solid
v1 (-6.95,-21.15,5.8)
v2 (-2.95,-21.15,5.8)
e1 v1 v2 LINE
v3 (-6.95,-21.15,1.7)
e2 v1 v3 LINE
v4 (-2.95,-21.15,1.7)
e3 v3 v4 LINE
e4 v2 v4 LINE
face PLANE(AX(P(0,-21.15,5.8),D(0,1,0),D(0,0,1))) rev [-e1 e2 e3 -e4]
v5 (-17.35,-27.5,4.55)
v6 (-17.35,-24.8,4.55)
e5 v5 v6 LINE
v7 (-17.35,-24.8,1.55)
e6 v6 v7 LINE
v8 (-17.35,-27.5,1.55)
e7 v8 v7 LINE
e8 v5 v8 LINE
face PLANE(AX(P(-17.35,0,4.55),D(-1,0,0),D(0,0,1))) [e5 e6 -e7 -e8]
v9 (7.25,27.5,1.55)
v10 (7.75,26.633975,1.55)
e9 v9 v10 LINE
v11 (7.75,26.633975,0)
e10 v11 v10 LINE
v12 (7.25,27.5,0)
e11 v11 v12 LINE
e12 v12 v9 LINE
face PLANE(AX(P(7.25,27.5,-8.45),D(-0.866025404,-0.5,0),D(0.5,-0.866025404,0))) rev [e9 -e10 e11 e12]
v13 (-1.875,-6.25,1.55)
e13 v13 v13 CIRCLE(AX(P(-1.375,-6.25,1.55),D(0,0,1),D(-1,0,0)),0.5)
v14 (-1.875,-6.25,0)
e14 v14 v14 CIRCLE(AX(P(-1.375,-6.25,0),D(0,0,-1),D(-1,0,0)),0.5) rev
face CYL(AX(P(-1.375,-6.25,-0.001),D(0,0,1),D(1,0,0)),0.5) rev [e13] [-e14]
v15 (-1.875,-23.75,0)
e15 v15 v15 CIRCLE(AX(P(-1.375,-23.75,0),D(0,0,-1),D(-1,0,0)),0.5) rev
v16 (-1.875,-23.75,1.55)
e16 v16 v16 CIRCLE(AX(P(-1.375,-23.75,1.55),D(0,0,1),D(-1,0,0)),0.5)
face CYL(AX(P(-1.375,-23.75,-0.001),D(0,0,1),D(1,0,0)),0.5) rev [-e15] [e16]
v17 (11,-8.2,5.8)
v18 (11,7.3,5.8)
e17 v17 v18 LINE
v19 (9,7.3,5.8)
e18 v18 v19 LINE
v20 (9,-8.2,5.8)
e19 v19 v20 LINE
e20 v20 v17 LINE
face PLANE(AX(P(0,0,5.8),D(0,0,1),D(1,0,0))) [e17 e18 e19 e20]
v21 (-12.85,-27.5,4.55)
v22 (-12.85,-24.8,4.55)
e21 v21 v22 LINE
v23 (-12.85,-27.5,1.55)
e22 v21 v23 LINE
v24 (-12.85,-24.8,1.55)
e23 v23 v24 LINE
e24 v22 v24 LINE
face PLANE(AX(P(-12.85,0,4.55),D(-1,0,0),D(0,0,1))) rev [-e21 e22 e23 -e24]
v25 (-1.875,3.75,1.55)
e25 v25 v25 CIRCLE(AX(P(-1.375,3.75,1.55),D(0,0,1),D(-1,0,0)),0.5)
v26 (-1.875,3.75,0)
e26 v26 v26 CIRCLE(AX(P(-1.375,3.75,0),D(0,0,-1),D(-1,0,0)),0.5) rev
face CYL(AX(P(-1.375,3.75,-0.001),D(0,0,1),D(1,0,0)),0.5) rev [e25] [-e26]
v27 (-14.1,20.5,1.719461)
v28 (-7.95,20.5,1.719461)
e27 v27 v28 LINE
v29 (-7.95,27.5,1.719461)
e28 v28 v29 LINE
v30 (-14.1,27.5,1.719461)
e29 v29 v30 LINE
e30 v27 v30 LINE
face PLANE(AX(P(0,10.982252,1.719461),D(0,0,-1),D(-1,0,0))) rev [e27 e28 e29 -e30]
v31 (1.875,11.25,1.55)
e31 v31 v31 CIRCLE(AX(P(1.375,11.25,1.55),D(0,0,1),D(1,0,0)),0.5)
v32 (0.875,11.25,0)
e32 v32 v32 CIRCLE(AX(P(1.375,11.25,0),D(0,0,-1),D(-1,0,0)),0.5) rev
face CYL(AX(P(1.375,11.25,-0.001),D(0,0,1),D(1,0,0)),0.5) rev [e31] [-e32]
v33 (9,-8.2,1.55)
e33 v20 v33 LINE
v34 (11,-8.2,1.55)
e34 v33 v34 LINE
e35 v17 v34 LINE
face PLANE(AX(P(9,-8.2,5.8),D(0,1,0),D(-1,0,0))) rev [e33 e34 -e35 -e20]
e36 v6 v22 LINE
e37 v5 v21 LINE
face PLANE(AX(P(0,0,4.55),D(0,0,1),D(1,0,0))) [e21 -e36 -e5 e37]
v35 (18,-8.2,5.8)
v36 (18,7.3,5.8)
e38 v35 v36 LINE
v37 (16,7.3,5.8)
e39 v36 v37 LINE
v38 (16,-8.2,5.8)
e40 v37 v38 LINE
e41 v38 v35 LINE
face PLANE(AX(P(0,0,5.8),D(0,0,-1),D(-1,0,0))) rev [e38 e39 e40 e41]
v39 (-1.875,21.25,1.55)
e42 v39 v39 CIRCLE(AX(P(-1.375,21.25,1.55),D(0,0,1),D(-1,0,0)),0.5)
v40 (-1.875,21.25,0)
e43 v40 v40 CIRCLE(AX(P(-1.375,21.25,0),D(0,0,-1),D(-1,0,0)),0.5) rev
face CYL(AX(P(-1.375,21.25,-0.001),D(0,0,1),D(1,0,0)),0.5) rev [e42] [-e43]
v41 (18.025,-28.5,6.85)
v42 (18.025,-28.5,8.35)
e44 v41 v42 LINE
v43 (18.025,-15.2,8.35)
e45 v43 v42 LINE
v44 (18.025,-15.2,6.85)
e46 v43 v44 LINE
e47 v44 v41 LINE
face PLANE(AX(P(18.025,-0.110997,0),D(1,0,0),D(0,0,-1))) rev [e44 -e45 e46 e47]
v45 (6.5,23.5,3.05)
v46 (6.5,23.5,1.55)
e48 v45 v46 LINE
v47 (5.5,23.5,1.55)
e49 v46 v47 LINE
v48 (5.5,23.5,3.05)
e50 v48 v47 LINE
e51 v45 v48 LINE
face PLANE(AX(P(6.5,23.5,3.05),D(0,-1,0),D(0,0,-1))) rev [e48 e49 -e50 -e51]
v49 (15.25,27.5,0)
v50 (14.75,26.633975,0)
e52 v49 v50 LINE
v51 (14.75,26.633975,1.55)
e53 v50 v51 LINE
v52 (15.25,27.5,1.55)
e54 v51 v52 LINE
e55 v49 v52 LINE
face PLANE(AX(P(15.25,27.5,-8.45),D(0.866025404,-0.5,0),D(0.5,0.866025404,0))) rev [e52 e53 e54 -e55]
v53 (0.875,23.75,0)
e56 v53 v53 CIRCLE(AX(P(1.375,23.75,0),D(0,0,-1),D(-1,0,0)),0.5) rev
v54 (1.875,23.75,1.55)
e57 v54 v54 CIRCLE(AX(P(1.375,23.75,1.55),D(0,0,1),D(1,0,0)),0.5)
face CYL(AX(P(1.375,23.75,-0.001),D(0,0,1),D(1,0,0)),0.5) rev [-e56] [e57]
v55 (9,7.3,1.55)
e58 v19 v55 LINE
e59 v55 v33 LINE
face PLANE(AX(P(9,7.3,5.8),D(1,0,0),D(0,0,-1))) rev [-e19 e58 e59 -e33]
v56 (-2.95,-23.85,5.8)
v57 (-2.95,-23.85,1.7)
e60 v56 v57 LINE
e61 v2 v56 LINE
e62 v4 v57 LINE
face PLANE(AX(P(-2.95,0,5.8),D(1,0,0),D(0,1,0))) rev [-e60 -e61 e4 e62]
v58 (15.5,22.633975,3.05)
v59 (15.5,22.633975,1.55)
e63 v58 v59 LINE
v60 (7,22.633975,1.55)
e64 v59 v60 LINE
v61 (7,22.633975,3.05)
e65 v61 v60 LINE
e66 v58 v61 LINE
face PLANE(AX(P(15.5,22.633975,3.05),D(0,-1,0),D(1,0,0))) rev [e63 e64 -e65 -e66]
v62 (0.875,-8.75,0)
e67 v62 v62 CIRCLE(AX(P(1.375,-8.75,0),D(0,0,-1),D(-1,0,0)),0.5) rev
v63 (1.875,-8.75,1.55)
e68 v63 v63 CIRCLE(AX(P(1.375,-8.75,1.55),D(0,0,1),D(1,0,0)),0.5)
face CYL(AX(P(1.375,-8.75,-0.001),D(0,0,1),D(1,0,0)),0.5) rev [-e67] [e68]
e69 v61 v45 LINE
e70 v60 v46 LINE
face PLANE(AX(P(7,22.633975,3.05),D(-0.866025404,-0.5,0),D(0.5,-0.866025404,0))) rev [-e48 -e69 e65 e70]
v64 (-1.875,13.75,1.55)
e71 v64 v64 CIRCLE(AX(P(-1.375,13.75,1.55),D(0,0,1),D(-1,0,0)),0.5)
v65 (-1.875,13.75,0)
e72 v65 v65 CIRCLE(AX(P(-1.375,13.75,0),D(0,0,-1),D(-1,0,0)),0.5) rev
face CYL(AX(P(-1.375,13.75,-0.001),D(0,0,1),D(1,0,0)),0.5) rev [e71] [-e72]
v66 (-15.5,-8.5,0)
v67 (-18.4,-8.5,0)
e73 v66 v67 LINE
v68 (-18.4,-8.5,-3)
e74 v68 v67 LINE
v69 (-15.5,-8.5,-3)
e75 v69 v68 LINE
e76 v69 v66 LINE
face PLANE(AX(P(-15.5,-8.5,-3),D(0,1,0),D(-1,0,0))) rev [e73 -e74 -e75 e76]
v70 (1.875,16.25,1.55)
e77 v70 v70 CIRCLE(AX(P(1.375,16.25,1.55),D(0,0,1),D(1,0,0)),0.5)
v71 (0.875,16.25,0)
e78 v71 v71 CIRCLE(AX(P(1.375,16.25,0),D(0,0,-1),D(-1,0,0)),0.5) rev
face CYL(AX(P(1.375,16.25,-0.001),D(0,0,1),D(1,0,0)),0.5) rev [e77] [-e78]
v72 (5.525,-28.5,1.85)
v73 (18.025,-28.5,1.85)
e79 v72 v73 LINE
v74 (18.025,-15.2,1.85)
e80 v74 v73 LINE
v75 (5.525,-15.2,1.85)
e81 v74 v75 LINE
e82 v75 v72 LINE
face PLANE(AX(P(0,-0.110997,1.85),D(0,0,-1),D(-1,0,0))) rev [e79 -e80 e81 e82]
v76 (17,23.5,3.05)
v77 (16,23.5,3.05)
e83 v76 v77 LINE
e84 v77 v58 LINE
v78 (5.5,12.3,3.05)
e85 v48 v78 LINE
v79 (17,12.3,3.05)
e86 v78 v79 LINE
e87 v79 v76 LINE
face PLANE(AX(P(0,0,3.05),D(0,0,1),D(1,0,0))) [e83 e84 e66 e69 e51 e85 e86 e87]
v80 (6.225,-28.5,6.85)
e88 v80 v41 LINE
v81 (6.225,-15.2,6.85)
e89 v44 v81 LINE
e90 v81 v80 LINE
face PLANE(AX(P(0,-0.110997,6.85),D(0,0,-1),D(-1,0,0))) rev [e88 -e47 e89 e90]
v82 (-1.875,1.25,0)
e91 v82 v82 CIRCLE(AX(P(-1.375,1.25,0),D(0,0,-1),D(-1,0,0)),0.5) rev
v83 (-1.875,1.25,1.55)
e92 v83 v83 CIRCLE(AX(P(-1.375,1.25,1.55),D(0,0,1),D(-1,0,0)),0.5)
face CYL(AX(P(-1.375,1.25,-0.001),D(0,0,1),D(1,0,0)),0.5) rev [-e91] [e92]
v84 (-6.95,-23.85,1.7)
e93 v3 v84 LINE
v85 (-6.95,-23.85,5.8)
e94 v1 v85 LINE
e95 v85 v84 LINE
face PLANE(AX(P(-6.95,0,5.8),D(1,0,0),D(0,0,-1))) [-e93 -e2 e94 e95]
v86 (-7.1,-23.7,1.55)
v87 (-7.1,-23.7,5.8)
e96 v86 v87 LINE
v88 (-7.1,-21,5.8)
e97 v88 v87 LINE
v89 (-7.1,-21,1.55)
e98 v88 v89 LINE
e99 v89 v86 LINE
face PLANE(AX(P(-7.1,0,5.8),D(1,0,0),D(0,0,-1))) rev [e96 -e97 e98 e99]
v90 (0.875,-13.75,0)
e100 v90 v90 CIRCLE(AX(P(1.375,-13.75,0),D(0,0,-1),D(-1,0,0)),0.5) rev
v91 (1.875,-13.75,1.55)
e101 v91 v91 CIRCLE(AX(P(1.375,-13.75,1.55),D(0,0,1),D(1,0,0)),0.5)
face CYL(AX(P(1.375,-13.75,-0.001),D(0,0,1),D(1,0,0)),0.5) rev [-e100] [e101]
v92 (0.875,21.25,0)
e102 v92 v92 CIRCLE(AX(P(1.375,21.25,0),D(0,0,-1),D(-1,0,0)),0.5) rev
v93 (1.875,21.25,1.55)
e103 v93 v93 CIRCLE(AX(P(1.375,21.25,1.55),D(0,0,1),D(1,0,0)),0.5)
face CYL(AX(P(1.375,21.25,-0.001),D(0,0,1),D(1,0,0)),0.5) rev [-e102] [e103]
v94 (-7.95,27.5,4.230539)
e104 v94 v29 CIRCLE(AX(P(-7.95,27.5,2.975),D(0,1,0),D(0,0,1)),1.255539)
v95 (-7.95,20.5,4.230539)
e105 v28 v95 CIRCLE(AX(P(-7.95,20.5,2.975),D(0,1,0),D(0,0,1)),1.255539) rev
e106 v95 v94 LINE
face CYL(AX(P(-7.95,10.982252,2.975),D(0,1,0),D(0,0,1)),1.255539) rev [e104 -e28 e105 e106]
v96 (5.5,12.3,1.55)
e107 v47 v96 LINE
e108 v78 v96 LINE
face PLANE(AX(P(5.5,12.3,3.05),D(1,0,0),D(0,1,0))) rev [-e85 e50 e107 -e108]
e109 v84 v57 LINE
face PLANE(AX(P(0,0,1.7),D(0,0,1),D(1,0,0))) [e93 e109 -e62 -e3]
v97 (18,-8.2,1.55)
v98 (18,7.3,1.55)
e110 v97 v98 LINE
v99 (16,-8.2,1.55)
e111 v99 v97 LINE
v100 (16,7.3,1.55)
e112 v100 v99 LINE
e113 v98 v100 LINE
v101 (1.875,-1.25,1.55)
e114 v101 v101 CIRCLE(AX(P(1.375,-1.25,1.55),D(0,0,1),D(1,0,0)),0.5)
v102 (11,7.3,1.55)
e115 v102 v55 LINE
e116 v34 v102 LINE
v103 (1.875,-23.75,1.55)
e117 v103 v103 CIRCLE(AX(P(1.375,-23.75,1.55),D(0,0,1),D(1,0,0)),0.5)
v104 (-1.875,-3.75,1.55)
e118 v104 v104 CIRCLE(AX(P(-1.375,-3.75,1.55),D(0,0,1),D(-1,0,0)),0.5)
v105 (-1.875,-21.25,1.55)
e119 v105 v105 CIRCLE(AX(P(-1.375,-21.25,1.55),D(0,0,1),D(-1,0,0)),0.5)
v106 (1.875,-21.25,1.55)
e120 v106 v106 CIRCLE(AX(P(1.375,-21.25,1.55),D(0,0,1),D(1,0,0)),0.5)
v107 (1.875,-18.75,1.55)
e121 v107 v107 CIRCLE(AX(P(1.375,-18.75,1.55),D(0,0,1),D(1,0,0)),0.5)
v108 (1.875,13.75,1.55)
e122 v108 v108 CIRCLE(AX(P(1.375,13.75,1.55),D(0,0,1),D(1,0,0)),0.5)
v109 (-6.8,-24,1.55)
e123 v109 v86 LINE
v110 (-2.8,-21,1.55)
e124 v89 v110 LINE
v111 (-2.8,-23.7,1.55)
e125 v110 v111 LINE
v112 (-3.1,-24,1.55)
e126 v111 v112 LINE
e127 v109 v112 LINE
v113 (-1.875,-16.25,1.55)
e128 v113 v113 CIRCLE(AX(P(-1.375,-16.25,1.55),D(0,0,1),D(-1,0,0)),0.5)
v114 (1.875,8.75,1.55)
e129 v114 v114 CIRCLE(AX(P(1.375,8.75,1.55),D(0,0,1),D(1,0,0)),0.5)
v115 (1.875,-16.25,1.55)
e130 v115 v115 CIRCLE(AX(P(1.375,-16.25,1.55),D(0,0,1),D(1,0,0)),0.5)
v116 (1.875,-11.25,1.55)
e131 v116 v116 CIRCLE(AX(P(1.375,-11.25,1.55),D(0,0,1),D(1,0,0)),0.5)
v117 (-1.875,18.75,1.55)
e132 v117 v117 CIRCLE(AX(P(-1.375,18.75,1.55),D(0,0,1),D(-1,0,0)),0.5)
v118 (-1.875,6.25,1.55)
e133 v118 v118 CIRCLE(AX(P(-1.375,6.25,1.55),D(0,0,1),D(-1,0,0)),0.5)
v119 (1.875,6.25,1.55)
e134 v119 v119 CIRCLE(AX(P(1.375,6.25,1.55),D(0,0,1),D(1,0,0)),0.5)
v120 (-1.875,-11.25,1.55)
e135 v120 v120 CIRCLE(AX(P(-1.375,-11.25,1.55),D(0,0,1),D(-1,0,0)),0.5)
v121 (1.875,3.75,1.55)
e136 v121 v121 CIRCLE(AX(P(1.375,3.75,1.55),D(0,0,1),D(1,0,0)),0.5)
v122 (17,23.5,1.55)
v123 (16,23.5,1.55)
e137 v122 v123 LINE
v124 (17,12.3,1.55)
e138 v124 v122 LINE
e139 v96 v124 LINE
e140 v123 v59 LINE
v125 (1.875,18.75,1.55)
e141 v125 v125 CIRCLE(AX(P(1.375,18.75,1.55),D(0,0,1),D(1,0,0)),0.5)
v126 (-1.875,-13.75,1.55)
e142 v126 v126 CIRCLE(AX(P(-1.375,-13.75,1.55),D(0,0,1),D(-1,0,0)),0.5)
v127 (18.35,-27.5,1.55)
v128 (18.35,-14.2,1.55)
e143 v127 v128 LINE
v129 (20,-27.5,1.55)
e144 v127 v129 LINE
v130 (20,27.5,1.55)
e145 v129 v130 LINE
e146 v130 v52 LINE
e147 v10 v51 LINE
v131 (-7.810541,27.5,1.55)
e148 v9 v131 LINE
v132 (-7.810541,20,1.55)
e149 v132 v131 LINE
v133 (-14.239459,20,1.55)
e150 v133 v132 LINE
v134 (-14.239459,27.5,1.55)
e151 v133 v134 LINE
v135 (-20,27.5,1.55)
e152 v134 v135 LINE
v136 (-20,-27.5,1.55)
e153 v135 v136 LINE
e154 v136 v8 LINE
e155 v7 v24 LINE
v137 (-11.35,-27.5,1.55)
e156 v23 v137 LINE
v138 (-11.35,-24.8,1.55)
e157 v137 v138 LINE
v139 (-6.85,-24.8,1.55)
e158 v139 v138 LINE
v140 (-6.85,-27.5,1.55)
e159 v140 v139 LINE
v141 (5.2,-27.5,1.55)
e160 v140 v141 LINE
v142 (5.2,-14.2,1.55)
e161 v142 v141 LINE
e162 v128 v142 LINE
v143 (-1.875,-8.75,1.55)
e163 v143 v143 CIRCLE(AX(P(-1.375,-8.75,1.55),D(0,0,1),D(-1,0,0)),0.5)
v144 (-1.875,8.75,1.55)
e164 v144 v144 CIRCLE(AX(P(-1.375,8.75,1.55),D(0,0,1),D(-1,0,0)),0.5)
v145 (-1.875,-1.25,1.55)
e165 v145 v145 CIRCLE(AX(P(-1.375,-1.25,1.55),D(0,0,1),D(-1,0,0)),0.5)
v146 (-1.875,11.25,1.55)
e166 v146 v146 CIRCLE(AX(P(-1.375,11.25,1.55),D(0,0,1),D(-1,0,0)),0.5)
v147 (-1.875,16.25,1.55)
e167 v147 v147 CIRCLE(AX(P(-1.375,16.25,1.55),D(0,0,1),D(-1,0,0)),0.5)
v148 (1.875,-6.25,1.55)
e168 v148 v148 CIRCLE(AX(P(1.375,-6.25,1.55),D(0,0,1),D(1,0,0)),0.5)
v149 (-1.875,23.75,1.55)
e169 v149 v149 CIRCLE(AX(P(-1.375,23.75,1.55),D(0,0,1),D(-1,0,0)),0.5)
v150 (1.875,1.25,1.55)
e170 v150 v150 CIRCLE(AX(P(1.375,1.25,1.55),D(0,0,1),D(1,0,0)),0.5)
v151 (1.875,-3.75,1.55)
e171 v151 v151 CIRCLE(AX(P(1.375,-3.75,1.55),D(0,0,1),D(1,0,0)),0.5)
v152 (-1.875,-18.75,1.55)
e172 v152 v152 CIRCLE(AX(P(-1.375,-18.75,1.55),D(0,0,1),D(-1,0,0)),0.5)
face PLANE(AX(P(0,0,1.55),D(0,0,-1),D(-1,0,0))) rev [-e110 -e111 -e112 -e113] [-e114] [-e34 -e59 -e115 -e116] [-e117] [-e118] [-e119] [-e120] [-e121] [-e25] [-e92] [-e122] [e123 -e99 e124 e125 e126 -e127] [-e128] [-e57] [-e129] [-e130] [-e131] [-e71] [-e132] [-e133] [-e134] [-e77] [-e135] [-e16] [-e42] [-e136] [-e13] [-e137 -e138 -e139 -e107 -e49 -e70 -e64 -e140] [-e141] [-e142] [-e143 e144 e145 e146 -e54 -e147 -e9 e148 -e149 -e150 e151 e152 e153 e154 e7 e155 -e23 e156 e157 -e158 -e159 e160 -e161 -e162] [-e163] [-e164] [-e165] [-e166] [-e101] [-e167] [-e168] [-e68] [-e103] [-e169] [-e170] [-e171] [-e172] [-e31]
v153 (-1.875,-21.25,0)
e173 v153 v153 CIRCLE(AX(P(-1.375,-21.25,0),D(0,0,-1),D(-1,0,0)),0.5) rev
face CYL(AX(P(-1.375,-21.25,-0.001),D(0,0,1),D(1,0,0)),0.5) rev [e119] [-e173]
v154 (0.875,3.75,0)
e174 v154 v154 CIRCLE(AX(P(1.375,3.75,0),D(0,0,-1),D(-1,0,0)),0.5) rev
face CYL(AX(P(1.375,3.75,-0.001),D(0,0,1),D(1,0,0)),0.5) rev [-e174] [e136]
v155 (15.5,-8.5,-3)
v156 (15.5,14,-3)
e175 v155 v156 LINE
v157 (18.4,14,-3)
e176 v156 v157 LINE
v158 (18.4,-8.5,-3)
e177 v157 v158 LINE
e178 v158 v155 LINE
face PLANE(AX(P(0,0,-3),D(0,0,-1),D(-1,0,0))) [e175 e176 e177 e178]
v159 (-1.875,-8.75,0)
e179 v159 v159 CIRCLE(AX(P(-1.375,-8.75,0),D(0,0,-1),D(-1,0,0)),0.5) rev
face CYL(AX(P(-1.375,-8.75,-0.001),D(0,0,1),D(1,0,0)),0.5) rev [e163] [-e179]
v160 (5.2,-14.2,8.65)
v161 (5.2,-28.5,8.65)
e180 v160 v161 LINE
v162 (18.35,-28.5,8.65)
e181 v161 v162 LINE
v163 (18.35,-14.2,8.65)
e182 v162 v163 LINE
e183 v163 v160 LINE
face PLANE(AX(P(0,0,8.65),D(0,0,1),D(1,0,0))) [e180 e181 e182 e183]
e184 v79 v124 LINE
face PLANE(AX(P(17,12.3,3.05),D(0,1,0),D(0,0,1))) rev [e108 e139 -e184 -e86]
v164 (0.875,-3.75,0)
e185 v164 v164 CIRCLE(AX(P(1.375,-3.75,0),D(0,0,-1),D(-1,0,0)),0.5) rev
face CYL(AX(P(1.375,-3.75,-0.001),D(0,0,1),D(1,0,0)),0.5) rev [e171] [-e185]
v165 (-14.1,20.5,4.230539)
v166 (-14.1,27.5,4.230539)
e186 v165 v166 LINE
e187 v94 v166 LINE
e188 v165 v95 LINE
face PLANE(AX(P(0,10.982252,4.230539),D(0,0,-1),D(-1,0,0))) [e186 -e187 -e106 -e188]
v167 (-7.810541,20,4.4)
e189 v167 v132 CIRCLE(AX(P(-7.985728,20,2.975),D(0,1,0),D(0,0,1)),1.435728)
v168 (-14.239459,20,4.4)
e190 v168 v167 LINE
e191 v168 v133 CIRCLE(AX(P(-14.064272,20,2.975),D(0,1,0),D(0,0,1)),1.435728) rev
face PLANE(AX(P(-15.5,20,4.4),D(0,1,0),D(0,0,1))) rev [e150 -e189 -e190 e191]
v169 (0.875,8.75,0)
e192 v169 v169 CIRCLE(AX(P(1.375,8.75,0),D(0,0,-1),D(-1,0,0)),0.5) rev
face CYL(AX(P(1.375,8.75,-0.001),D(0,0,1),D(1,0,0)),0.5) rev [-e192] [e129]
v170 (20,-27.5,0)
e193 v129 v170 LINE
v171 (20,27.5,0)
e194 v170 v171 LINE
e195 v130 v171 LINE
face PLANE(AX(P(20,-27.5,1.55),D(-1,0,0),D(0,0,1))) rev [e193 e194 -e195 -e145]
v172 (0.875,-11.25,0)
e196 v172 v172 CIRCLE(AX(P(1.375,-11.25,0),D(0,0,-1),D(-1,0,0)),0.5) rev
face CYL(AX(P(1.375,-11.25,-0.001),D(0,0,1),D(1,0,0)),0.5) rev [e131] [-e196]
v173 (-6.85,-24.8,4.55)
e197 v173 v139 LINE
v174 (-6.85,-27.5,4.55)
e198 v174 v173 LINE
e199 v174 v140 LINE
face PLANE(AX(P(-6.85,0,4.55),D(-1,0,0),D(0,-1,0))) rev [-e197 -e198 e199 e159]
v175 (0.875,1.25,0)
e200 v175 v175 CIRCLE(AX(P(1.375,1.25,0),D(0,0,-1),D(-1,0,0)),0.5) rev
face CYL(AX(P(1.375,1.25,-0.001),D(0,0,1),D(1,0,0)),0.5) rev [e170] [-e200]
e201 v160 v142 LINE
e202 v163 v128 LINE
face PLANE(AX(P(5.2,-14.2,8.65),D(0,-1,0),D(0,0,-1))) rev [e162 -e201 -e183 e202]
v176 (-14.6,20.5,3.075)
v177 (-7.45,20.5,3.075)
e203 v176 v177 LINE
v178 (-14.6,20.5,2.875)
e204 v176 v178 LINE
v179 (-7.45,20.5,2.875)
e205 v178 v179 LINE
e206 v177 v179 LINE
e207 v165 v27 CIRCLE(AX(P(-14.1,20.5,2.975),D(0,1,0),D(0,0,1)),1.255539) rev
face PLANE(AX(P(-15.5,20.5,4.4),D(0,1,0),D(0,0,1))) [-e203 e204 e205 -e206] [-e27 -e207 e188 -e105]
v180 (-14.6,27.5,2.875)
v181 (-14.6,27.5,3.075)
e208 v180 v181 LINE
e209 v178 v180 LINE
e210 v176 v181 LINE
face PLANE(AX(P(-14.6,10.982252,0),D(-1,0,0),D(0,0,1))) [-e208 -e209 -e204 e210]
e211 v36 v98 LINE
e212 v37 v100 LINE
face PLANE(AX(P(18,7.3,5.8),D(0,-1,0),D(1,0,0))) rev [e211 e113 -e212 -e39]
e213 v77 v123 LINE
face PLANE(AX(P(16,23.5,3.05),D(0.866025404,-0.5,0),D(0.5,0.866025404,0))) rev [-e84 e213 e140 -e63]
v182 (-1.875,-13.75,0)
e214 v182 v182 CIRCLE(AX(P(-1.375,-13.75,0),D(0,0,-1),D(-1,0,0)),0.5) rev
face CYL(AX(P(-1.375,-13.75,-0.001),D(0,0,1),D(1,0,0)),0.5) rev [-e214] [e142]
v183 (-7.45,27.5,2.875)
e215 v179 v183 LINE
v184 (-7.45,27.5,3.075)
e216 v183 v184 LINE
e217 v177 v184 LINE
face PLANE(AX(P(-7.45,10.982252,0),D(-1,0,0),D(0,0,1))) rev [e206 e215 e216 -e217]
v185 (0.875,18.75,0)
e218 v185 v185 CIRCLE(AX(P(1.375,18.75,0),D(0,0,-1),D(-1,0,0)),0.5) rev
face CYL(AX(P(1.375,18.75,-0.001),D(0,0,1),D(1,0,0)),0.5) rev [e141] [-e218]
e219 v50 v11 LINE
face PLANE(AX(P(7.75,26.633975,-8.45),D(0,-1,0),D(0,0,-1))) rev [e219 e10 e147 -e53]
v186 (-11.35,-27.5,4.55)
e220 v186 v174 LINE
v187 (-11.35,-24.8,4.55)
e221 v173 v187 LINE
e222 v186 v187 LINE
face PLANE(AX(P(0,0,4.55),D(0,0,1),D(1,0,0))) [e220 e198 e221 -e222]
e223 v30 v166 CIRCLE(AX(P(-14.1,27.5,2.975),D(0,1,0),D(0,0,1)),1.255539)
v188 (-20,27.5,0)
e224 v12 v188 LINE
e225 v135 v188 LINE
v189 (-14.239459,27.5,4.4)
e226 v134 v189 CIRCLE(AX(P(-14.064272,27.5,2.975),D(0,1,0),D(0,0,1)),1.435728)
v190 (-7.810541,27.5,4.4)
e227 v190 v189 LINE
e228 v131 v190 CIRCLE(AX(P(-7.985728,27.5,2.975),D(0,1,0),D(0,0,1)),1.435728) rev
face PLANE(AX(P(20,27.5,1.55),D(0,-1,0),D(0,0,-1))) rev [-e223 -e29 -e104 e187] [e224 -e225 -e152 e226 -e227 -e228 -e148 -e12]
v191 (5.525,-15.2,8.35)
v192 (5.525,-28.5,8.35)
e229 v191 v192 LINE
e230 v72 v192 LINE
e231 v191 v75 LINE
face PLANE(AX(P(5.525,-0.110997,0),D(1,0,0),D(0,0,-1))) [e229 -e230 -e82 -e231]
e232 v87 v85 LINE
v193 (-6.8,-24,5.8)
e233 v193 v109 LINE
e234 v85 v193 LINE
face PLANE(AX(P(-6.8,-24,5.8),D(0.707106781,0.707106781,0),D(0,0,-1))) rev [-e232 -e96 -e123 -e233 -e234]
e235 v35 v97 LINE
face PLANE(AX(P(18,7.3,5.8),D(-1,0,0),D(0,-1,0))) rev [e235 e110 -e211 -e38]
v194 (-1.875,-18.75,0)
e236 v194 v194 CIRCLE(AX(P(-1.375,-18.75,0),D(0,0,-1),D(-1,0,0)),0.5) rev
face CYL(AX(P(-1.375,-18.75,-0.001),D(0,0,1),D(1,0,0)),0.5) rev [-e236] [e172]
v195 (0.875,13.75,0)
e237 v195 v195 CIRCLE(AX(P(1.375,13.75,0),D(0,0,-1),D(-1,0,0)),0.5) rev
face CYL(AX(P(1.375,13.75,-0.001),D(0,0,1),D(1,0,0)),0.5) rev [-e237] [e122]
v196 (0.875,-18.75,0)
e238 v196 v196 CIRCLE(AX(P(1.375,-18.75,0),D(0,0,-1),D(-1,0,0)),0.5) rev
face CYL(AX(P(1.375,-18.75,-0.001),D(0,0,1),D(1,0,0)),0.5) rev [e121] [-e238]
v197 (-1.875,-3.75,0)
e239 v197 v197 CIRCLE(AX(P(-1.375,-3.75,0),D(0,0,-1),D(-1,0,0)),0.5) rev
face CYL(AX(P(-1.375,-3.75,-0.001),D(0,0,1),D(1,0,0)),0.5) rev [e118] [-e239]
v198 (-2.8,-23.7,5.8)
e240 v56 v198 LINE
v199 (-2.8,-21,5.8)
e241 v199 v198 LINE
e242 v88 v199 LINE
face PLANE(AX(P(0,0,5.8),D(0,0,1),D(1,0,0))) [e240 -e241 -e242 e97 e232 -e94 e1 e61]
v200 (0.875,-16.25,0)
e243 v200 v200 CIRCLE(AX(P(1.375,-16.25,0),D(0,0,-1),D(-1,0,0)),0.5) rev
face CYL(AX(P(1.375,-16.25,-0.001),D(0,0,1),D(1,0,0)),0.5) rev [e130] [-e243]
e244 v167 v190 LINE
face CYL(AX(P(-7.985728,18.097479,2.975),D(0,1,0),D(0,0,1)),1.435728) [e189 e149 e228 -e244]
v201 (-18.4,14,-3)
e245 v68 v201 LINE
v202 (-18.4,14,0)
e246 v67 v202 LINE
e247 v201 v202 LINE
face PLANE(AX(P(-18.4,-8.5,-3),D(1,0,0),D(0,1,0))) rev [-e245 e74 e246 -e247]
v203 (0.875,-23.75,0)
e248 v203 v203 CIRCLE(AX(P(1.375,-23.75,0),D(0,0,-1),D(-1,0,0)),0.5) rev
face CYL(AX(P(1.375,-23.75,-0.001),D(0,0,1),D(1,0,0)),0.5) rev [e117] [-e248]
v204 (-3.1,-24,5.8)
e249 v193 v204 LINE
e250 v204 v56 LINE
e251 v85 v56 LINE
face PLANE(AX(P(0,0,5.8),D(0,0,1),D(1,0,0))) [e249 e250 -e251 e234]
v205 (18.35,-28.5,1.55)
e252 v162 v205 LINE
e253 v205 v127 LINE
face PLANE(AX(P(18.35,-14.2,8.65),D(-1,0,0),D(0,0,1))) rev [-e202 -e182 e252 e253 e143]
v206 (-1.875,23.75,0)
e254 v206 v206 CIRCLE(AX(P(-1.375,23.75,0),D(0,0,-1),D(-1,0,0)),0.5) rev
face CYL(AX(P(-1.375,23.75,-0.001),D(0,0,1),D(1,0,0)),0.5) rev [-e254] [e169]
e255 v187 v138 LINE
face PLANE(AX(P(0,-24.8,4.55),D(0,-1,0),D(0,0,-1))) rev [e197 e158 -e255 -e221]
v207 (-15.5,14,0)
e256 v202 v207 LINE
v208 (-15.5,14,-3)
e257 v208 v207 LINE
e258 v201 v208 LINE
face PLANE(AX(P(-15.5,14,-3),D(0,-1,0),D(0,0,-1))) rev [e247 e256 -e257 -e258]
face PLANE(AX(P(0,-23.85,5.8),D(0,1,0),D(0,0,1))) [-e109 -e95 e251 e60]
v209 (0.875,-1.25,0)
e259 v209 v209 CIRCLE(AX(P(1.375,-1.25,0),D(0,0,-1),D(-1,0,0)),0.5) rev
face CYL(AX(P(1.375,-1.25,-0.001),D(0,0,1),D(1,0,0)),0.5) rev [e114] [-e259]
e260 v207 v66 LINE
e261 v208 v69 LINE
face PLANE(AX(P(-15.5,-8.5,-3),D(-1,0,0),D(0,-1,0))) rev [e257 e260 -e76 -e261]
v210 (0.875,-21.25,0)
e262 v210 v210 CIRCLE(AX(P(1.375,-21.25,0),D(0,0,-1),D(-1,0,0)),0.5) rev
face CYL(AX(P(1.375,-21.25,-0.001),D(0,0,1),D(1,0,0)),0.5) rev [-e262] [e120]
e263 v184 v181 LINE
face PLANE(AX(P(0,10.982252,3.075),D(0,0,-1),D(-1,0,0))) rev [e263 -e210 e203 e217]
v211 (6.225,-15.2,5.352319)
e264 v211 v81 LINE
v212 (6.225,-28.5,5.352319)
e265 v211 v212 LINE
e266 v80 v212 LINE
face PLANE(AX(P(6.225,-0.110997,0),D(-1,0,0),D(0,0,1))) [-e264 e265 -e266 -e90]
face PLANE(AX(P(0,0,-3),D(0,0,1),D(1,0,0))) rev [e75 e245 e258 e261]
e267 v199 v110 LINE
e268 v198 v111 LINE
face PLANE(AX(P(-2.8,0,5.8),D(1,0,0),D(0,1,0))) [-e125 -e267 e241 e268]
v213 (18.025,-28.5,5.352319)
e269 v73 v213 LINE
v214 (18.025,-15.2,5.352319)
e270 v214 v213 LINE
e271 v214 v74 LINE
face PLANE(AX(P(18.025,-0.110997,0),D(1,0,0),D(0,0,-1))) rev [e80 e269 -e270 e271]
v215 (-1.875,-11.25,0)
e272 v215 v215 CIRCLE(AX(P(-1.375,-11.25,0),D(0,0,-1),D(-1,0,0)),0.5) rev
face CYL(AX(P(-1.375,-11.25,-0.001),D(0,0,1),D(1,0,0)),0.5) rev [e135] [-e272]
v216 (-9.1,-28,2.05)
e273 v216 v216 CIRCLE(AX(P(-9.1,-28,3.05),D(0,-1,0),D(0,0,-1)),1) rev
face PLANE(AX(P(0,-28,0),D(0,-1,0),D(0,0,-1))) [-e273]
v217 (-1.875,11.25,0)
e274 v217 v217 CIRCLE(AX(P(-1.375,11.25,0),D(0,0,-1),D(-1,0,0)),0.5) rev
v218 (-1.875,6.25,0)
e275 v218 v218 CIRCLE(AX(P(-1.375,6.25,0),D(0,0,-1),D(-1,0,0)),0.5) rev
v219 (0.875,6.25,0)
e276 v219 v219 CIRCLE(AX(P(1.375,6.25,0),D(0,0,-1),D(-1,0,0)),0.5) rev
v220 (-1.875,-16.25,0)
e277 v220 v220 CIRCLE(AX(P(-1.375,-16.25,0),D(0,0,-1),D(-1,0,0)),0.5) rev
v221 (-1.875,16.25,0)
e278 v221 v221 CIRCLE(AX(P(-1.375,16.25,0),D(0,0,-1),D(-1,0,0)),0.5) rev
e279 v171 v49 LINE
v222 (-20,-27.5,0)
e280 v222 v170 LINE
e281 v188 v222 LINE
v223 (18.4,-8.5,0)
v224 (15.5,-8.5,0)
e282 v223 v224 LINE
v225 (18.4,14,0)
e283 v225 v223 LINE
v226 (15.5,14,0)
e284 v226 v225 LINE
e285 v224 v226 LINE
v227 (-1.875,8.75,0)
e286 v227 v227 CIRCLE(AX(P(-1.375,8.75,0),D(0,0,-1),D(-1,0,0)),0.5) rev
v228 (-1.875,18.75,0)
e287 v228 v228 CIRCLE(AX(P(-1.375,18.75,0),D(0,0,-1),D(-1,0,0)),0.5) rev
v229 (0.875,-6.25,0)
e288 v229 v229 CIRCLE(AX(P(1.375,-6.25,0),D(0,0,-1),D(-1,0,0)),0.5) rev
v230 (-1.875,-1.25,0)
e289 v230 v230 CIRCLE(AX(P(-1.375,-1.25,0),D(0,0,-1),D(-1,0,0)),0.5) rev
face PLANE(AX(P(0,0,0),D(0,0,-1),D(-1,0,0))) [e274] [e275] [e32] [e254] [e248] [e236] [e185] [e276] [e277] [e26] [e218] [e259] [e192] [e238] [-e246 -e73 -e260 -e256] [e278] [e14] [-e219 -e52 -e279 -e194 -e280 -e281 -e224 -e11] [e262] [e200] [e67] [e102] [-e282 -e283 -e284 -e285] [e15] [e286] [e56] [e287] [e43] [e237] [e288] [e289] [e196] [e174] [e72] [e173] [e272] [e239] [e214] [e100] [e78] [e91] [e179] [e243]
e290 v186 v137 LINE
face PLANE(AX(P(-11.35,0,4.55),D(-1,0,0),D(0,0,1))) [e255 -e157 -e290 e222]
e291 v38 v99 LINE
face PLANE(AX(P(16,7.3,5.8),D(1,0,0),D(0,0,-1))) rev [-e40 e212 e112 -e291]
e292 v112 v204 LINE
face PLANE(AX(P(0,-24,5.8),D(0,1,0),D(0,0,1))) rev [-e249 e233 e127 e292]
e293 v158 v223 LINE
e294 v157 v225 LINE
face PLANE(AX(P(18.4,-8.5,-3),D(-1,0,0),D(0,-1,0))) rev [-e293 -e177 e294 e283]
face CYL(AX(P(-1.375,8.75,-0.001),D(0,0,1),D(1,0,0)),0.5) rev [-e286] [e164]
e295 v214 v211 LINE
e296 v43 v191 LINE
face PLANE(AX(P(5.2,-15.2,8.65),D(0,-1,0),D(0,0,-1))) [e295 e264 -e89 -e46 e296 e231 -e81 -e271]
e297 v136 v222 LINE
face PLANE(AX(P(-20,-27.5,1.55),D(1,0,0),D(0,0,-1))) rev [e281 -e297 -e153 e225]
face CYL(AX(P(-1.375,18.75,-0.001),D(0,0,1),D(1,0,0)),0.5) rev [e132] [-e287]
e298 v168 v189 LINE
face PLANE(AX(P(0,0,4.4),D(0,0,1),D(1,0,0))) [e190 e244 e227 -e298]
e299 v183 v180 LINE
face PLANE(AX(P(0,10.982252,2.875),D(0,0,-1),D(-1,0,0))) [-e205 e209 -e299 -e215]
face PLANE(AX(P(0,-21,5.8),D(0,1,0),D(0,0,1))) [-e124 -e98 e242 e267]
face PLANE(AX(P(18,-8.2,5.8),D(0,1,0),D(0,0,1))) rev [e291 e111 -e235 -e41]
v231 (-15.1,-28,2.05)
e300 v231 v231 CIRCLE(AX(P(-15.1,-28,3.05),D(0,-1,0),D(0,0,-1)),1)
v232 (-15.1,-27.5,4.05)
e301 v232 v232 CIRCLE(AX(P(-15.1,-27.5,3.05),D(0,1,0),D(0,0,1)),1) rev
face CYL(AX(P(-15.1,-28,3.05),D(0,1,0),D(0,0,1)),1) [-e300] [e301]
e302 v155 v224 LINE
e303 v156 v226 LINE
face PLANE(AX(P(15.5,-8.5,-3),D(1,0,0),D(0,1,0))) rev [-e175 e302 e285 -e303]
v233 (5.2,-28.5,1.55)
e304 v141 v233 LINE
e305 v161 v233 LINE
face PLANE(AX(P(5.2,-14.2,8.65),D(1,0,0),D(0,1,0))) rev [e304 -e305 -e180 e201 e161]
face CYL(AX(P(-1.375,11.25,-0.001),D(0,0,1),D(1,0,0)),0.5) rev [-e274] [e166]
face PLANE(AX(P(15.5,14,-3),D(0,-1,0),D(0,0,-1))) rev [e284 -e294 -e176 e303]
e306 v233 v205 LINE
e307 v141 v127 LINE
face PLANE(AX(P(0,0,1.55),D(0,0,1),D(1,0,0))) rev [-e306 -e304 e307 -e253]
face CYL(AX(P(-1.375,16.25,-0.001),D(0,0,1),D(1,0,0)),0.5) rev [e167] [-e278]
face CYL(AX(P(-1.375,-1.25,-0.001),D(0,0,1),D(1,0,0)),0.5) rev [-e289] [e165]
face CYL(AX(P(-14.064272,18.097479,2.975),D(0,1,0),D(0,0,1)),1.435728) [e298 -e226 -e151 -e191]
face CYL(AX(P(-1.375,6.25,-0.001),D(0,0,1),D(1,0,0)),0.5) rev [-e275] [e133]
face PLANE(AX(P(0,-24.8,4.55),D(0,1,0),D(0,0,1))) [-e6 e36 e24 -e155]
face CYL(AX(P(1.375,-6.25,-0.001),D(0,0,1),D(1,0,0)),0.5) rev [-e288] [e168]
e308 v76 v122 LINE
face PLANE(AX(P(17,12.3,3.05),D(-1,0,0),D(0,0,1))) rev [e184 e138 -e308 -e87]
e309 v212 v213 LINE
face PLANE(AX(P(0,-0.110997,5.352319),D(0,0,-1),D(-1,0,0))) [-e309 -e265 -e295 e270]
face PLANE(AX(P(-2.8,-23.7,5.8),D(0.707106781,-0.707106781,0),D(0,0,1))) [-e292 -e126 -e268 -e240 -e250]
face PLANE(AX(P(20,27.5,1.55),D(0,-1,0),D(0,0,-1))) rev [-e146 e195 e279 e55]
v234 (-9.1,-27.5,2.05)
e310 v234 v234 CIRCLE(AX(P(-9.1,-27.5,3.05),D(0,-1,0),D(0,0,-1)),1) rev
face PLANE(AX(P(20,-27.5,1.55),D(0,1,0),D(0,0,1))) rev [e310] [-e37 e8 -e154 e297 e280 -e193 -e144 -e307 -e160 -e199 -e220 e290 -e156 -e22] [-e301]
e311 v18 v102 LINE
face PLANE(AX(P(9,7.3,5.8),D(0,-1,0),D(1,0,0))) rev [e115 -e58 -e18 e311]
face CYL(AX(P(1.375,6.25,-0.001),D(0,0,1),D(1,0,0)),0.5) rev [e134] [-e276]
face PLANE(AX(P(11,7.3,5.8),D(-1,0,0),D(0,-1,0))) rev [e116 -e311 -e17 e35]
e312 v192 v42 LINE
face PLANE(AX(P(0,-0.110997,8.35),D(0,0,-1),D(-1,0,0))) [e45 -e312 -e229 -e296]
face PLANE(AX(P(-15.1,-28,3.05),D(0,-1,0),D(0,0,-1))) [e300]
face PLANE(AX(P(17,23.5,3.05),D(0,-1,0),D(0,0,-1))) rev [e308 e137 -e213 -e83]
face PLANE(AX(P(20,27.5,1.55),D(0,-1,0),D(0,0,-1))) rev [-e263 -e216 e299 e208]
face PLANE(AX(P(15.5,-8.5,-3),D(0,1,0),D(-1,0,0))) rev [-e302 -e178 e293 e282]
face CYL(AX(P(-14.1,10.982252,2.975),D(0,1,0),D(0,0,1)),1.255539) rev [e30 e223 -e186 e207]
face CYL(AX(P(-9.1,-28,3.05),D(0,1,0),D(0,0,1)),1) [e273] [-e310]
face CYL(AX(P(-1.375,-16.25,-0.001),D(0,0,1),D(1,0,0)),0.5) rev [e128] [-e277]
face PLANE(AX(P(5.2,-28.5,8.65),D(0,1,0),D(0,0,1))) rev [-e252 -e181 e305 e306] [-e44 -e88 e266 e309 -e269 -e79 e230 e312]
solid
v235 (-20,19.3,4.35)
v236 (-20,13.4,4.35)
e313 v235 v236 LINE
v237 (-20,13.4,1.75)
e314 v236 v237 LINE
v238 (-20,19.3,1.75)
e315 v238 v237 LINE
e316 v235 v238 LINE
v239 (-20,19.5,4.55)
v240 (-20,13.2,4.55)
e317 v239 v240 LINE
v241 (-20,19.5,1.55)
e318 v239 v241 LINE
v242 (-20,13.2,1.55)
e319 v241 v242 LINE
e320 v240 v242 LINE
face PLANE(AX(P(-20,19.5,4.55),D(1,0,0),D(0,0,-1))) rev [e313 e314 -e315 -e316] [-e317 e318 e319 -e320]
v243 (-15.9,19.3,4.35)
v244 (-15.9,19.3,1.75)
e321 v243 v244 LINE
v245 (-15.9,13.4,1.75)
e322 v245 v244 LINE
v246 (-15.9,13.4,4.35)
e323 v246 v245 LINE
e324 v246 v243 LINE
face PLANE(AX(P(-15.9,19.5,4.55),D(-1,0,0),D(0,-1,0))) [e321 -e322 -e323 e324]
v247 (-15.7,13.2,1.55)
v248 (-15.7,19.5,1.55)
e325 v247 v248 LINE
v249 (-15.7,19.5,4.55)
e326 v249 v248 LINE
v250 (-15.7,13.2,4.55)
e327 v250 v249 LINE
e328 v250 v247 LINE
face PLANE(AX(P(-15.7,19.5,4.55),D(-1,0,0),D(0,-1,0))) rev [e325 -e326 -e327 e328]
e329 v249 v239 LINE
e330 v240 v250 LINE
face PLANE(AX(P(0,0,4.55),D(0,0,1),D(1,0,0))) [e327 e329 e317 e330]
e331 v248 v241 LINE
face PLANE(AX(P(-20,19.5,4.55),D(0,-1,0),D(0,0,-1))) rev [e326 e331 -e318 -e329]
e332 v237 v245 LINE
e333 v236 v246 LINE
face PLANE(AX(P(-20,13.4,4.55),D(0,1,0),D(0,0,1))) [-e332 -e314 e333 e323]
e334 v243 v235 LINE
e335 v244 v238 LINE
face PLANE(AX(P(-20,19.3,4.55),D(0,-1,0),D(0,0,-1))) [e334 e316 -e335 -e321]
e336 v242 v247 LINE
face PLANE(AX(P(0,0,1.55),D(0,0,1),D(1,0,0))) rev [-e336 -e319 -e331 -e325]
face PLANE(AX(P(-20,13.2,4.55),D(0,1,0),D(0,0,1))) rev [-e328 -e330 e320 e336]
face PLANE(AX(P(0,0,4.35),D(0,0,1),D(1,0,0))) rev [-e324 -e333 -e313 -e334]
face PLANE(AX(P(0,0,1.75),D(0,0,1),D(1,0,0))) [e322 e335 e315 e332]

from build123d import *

# Parameters (mm, degrees)
SKETCH1_W            = 55
SKETCH1_H            = 40
BOSS_EXTRUDE1_DEPTH  = 1.55
SKETCH2_W            = 13.15
SKETCH2_H            = 14.3
BOSS_EXTRUDE2_DEPTH  = 7.1
CUT_EXTRUDE1_DEPTH   = 13.3
SKETCH4_W            = 8.95
SKETCH4_H            = 7.5
BOSS_EXTRUDE3_DEPTH  = 2.85
CUT_EXTRUDE2_DEPTH   = 7.5
SKETCH5_3_W          = 7.15
SKETCH5_3_H          = 0.2
CUT_EXTRUDE3_DEPTH   = 7
BOSS_EXTRUDE4_DEPTH  = 1.5
CUT_EXTRUDE4_DEPTH   = 10
SKETCH8_W            = 4.5
SKETCH8_H            = 2.7
BOSS_EXTRUDE5_DEPTH  = 3
SKETCH9_R            = 1
BOSS_EXTRUDE6_DEPTH  = 0.5
SKETCH10_W           = 2
SKETCH10_H           = 15.5
BOSS_EXTRUDE7_DEPTH  = 4.25
SKETCH8_4_W          = 4.3
SKETCH8_4_H          = 3
BOSS_EXTRUDE9_DEPTH  = 4.25
SHELL2_T             = -0.15
CHAMFER1_SIZE        = 0.3
SKETCH11_R           = 0.5
CUT_EXTRUDE5_DEPTH   = 1.55
SKETCH12_W           = 4.3
SKETCH12_H           = 6.3
BOSS_EXTRUDE10_DEPTH = 3
SHELL3_T             = -0.2
SKETCH13_W           = 2.9
SKETCH13_H           = 22.5
BOSS_EXTRUDE11_DEPTH = 3


with BuildPart() as part:
    # Sketch1 → Boss-Extrude1 (new body)
    with BuildSketch(Plane(origin=(0, 0, 0), x_dir=(0, 1, 0), z_dir=(0, 0, 1))):
        Rectangle(SKETCH1_W, SKETCH1_H)
    extrude(amount=BOSS_EXTRUDE1_DEPTH)

    # Sketch2 → Boss-Extrude2 (add)
    with BuildSketch(Plane.XY.offset(1.55)):
        with Locations((11.775, -21.35)):
            Rectangle(SKETCH2_W, SKETCH2_H)
    extrude(amount=BOSS_EXTRUDE2_DEPTH)

    # Sketch3 → Cut-Extrude1 (cut)
    with BuildSketch(Plane.XZ.offset(28.5)):
        Polygon((5.525, 8.35), (5.525, 1.85), (18.025, 1.85), (18.025, 5.352318912), (6.225, 5.352318912), (6.225, 6.85), (18.025, 6.85), (18.025, 8.35), align=None)
    extrude(amount=-CUT_EXTRUDE1_DEPTH, mode=Mode.SUBTRACT)

    # Sketch4 → Boss-Extrude3 (add)
    with BuildSketch(Plane.XY.offset(1.55)):
        with Locations((-11.025, 23.75)):
            Rectangle(SKETCH4_W, SKETCH4_H)
    extrude(amount=BOSS_EXTRUDE3_DEPTH)

    # Sketch5 → Cut-Extrude2 (cut)
    with BuildSketch(Plane(origin=(0, 27.5, 0), x_dir=(-1, 0, 0), z_dir=(0, 1, 0))):
        with BuildLine():
            Line((6.55, 4.4), (6.55, 2.975))
            ThreePointArc((6.55, 2.975), (6.910359128, 3.926260685), (7.810540583, 4.4))
            Line((7.810540583, 4.4), (6.55, 4.4))
        make_face()
        with BuildLine():
            Line((6.55, 1.55), (7.810540583, 1.55))
            ThreePointArc((7.810540583, 1.55), (6.910359128, 2.023739315), (6.55, 2.975))
            Line((6.55, 2.975), (6.55, 1.55))
        make_face()
        with BuildLine():
            Line((15.5, 1.55), (15.5, 2.975))
            ThreePointArc((15.5, 2.975), (15.139640872, 2.023739315), (14.239459417, 1.55))
            Line((14.239459417, 1.55), (15.5, 1.55))
        make_face()
        with BuildLine():
            Line((15.5, 4.4), (14.239459417, 4.4))
            ThreePointArc((14.239459417, 4.4), (15.139640872, 3.926260685), (15.5, 2.975))
            Line((15.5, 2.975), (15.5, 4.4))
        make_face()
    extrude(amount=-CUT_EXTRUDE2_DEPTH, mode=Mode.SUBTRACT)

    # Sketch5<3> → Cut-Extrude3 (cut)
    with BuildSketch(Plane(origin=(0, 27.5, 0), x_dir=(-1, 0, 0), z_dir=(0, 1, 0))):
        with BuildLine():
            Line((7.95, 1.719461162), (14.1, 1.719461162))
            ThreePointArc((14.1, 1.719461162), (15.355538838, 2.975), (14.1, 4.230538838))
            Line((14.1, 4.230538838), (7.95, 4.230538838))
            ThreePointArc((7.95, 4.230538838), (6.694461162, 2.975), (7.95, 1.719461162))
        make_face()
        with Locations((11.025, 2.975)):
            Rectangle(SKETCH5_3_W, SKETCH5_3_H, mode=Mode.SUBTRACT)
    extrude(amount=-CUT_EXTRUDE3_DEPTH, mode=Mode.SUBTRACT)

    # Sketch6 → Boss-Extrude4 (add)
    with BuildSketch(Plane.XY.offset(1.55)):
        Polygon((16, 23.5), (15.5, 22.633974596), (7, 22.633974596), (6.5, 23.5), (5.5, 23.5), (5.5, 12.3), (17, 12.3), (17, 23.5), align=None)
    extrude(amount=BOSS_EXTRUDE4_DEPTH)

    # Sketch7 → Cut-Extrude4 (cut)
    with BuildSketch(Plane.XY.offset(1.55)):
        Polygon((7.25, 27.5), (7.75, 26.633974596), (14.75, 26.633974596), (15.25, 27.5), align=None)
    extrude(amount=-CUT_EXTRUDE4_DEPTH, mode=Mode.SUBTRACT)

    # Sketch8 → Boss-Extrude5 (add)
    with BuildSketch(Plane.XY.offset(1.55)):
        with Locations((-9.1, -26.15)):
            Rectangle(SKETCH8_W, SKETCH8_H)
        with Locations((-15.1, -26.15)):
            Rectangle(SKETCH8_W, SKETCH8_H)
    extrude(amount=BOSS_EXTRUDE5_DEPTH)

    # Sketch9 → Boss-Extrude6 (add)
    with BuildSketch(Plane.XZ.offset(27.5)):
        with Locations(Location((-9.1, 3.05, 0), (0, 0, 270))):
            Circle(SKETCH9_R)
        with Locations(Location((-15.1, 3.05, 0), (0, 0, 90))):
            Circle(SKETCH9_R)
    extrude(amount=BOSS_EXTRUDE6_DEPTH)

    # Sketch10 → Boss-Extrude7 (add)
    with BuildSketch(Plane.XY.offset(1.55)):
        with Locations((17, -0.45)):
            Rectangle(SKETCH10_W, SKETCH10_H)
        with Locations((10, -0.45)):
            Rectangle(SKETCH10_W, SKETCH10_H)
    extrude(amount=BOSS_EXTRUDE7_DEPTH)


with BuildPart() as body_2:
    # Sketch8<4> → Boss-Extrude9 (new body)
    with BuildSketch(Plane.XY.offset(1.55)):
        with Locations((-4.95, -22.5)):
            Rectangle(SKETCH8_4_W, SKETCH8_4_H)
    extrude(amount=BOSS_EXTRUDE9_DEPTH)

    # Shell2
    shell2_openings = [body_2.faces().sort_by_distance(p)[0] for p in [
        (-4.95, -22.5, 5.8),
    ]]
    offset(amount=SHELL2_T, openings=shell2_openings, kind=Kind.INTERSECTION)


with BuildPart() as part_1:
    add(part.part)

    # Combine1: union body 2
    add(body_2.part)

    # Chamfer1
    chamfer1_edges = [part_1.edges().sort_by_distance(p)[0] for p in [
        (-2.8, -24, 3.675),
        (-7.1, -24, 3.675),
    ]]
    chamfer(chamfer1_edges, length=CHAMFER1_SIZE - 0.0001)  # a hair under: the kernel refuses the full size

    # Sketch11 → Cut-Extrude5 (cut)
    with BuildSketch(Plane.XY.offset(1.55)):
        with Locations((1.375, 23.75)):
            Circle(SKETCH11_R)
        with Locations((1.375, 21.25)):
            Circle(SKETCH11_R)
        with Locations((1.375, 18.75)):
            Circle(SKETCH11_R)
        with Locations((1.375, 16.25)):
            Circle(SKETCH11_R)
        with Locations((1.375, 13.75)):
            Circle(SKETCH11_R)
        with Locations((1.375, 11.25)):
            Circle(SKETCH11_R)
        with Locations((1.375, 8.75)):
            Circle(SKETCH11_R)
        with Locations((1.375, 6.25)):
            Circle(SKETCH11_R)
        with Locations((1.375, 3.75)):
            Circle(SKETCH11_R)
        with Locations((1.375, 1.25)):
            Circle(SKETCH11_R)
        with Locations((1.375, -1.25)):
            Circle(SKETCH11_R)
        with Locations((1.375, -3.75)):
            Circle(SKETCH11_R)
        with Locations((1.375, -6.25)):
            Circle(SKETCH11_R)
        with Locations((1.375, -8.75)):
            Circle(SKETCH11_R)
        with Locations((1.375, -11.25)):
            Circle(SKETCH11_R)
        with Locations((1.375, -13.75)):
            Circle(SKETCH11_R)
        with Locations((1.375, -16.25)):
            Circle(SKETCH11_R)
        with Locations((1.375, -18.75)):
            Circle(SKETCH11_R)
        with Locations((1.375, -21.25)):
            Circle(SKETCH11_R)
        with Locations((1.375, -23.75)):
            Circle(SKETCH11_R)
        with Locations(Location((-1.375, -23.75, 0), (0, 0, 180))):
            Circle(SKETCH11_R)
        with Locations(Location((-1.375, -21.25, 0), (0, 0, 180))):
            Circle(SKETCH11_R)
        with Locations(Location((-1.375, -18.75, 0), (0, 0, 180))):
            Circle(SKETCH11_R)
        with Locations(Location((-1.375, -16.25, 0), (0, 0, 180))):
            Circle(SKETCH11_R)
        with Locations(Location((-1.375, -13.75, 0), (0, 0, 180))):
            Circle(SKETCH11_R)
        with Locations(Location((-1.375, -11.25, 0), (0, 0, 180))):
            Circle(SKETCH11_R)
        with Locations(Location((-1.375, -8.75, 0), (0, 0, 180))):
            Circle(SKETCH11_R)
        with Locations(Location((-1.375, -6.25, 0), (0, 0, 180))):
            Circle(SKETCH11_R)
        with Locations(Location((-1.375, -3.75, 0), (0, 0, 180))):
            Circle(SKETCH11_R)
        with Locations(Location((-1.375, -1.25, 0), (0, 0, 180))):
            Circle(SKETCH11_R)
        with Locations(Location((-1.375, 1.25, 0), (0, 0, 180))):
            Circle(SKETCH11_R)
        with Locations(Location((-1.375, 3.75, 0), (0, 0, 180))):
            Circle(SKETCH11_R)
        with Locations(Location((-1.375, 6.25, 0), (0, 0, 180))):
            Circle(SKETCH11_R)
        with Locations(Location((-1.375, 8.75, 0), (0, 0, 180))):
            Circle(SKETCH11_R)
        with Locations(Location((-1.375, 11.25, 0), (0, 0, 180))):
            Circle(SKETCH11_R)
        with Locations(Location((-1.375, 13.75, 0), (0, 0, 180))):
            Circle(SKETCH11_R)
        with Locations(Location((-1.375, 16.25, 0), (0, 0, 180))):
            Circle(SKETCH11_R)
        with Locations(Location((-1.375, 18.75, 0), (0, 0, 180))):
            Circle(SKETCH11_R)
        with Locations(Location((-1.375, 23.75, 0), (0, 0, 180))):
            Circle(SKETCH11_R)
        with Locations(Location((-1.375, 21.25, 0), (0, 0, 180))):
            Circle(SKETCH11_R)
    extrude(amount=-CUT_EXTRUDE5_DEPTH, mode=Mode.SUBTRACT)

    # Sketch13 → Boss-Extrude11 (add)
    with BuildSketch(Plane(origin=(0, 0, 0), x_dir=(1, 0, 0), z_dir=(0, 0, -1))):
        with Locations((16.95, -2.75)):
            Rectangle(SKETCH13_W, SKETCH13_H)
        with Locations((-16.95, -2.75)):
            Rectangle(SKETCH13_W, SKETCH13_H)
    extrude(amount=BOSS_EXTRUDE11_DEPTH)


with BuildPart() as body_2_2:
    # Sketch12 → Boss-Extrude10 (new body)
    with BuildSketch(Plane.XY.offset(1.55)):
        with Locations((-17.85, 16.35)):
            Rectangle(SKETCH12_W, SKETCH12_H)
    extrude(amount=BOSS_EXTRUDE10_DEPTH)

    # Shell3
    shell3_openings = [body_2_2.faces().sort_by_distance(p)[0] for p in [
        (-20, 16.35, 3.05),
    ]]
    offset(amount=SHELL3_T, openings=shell3_openings, kind=Kind.INTERSECTION)


solid = Compound([part_1.part, body_2_2.part])
